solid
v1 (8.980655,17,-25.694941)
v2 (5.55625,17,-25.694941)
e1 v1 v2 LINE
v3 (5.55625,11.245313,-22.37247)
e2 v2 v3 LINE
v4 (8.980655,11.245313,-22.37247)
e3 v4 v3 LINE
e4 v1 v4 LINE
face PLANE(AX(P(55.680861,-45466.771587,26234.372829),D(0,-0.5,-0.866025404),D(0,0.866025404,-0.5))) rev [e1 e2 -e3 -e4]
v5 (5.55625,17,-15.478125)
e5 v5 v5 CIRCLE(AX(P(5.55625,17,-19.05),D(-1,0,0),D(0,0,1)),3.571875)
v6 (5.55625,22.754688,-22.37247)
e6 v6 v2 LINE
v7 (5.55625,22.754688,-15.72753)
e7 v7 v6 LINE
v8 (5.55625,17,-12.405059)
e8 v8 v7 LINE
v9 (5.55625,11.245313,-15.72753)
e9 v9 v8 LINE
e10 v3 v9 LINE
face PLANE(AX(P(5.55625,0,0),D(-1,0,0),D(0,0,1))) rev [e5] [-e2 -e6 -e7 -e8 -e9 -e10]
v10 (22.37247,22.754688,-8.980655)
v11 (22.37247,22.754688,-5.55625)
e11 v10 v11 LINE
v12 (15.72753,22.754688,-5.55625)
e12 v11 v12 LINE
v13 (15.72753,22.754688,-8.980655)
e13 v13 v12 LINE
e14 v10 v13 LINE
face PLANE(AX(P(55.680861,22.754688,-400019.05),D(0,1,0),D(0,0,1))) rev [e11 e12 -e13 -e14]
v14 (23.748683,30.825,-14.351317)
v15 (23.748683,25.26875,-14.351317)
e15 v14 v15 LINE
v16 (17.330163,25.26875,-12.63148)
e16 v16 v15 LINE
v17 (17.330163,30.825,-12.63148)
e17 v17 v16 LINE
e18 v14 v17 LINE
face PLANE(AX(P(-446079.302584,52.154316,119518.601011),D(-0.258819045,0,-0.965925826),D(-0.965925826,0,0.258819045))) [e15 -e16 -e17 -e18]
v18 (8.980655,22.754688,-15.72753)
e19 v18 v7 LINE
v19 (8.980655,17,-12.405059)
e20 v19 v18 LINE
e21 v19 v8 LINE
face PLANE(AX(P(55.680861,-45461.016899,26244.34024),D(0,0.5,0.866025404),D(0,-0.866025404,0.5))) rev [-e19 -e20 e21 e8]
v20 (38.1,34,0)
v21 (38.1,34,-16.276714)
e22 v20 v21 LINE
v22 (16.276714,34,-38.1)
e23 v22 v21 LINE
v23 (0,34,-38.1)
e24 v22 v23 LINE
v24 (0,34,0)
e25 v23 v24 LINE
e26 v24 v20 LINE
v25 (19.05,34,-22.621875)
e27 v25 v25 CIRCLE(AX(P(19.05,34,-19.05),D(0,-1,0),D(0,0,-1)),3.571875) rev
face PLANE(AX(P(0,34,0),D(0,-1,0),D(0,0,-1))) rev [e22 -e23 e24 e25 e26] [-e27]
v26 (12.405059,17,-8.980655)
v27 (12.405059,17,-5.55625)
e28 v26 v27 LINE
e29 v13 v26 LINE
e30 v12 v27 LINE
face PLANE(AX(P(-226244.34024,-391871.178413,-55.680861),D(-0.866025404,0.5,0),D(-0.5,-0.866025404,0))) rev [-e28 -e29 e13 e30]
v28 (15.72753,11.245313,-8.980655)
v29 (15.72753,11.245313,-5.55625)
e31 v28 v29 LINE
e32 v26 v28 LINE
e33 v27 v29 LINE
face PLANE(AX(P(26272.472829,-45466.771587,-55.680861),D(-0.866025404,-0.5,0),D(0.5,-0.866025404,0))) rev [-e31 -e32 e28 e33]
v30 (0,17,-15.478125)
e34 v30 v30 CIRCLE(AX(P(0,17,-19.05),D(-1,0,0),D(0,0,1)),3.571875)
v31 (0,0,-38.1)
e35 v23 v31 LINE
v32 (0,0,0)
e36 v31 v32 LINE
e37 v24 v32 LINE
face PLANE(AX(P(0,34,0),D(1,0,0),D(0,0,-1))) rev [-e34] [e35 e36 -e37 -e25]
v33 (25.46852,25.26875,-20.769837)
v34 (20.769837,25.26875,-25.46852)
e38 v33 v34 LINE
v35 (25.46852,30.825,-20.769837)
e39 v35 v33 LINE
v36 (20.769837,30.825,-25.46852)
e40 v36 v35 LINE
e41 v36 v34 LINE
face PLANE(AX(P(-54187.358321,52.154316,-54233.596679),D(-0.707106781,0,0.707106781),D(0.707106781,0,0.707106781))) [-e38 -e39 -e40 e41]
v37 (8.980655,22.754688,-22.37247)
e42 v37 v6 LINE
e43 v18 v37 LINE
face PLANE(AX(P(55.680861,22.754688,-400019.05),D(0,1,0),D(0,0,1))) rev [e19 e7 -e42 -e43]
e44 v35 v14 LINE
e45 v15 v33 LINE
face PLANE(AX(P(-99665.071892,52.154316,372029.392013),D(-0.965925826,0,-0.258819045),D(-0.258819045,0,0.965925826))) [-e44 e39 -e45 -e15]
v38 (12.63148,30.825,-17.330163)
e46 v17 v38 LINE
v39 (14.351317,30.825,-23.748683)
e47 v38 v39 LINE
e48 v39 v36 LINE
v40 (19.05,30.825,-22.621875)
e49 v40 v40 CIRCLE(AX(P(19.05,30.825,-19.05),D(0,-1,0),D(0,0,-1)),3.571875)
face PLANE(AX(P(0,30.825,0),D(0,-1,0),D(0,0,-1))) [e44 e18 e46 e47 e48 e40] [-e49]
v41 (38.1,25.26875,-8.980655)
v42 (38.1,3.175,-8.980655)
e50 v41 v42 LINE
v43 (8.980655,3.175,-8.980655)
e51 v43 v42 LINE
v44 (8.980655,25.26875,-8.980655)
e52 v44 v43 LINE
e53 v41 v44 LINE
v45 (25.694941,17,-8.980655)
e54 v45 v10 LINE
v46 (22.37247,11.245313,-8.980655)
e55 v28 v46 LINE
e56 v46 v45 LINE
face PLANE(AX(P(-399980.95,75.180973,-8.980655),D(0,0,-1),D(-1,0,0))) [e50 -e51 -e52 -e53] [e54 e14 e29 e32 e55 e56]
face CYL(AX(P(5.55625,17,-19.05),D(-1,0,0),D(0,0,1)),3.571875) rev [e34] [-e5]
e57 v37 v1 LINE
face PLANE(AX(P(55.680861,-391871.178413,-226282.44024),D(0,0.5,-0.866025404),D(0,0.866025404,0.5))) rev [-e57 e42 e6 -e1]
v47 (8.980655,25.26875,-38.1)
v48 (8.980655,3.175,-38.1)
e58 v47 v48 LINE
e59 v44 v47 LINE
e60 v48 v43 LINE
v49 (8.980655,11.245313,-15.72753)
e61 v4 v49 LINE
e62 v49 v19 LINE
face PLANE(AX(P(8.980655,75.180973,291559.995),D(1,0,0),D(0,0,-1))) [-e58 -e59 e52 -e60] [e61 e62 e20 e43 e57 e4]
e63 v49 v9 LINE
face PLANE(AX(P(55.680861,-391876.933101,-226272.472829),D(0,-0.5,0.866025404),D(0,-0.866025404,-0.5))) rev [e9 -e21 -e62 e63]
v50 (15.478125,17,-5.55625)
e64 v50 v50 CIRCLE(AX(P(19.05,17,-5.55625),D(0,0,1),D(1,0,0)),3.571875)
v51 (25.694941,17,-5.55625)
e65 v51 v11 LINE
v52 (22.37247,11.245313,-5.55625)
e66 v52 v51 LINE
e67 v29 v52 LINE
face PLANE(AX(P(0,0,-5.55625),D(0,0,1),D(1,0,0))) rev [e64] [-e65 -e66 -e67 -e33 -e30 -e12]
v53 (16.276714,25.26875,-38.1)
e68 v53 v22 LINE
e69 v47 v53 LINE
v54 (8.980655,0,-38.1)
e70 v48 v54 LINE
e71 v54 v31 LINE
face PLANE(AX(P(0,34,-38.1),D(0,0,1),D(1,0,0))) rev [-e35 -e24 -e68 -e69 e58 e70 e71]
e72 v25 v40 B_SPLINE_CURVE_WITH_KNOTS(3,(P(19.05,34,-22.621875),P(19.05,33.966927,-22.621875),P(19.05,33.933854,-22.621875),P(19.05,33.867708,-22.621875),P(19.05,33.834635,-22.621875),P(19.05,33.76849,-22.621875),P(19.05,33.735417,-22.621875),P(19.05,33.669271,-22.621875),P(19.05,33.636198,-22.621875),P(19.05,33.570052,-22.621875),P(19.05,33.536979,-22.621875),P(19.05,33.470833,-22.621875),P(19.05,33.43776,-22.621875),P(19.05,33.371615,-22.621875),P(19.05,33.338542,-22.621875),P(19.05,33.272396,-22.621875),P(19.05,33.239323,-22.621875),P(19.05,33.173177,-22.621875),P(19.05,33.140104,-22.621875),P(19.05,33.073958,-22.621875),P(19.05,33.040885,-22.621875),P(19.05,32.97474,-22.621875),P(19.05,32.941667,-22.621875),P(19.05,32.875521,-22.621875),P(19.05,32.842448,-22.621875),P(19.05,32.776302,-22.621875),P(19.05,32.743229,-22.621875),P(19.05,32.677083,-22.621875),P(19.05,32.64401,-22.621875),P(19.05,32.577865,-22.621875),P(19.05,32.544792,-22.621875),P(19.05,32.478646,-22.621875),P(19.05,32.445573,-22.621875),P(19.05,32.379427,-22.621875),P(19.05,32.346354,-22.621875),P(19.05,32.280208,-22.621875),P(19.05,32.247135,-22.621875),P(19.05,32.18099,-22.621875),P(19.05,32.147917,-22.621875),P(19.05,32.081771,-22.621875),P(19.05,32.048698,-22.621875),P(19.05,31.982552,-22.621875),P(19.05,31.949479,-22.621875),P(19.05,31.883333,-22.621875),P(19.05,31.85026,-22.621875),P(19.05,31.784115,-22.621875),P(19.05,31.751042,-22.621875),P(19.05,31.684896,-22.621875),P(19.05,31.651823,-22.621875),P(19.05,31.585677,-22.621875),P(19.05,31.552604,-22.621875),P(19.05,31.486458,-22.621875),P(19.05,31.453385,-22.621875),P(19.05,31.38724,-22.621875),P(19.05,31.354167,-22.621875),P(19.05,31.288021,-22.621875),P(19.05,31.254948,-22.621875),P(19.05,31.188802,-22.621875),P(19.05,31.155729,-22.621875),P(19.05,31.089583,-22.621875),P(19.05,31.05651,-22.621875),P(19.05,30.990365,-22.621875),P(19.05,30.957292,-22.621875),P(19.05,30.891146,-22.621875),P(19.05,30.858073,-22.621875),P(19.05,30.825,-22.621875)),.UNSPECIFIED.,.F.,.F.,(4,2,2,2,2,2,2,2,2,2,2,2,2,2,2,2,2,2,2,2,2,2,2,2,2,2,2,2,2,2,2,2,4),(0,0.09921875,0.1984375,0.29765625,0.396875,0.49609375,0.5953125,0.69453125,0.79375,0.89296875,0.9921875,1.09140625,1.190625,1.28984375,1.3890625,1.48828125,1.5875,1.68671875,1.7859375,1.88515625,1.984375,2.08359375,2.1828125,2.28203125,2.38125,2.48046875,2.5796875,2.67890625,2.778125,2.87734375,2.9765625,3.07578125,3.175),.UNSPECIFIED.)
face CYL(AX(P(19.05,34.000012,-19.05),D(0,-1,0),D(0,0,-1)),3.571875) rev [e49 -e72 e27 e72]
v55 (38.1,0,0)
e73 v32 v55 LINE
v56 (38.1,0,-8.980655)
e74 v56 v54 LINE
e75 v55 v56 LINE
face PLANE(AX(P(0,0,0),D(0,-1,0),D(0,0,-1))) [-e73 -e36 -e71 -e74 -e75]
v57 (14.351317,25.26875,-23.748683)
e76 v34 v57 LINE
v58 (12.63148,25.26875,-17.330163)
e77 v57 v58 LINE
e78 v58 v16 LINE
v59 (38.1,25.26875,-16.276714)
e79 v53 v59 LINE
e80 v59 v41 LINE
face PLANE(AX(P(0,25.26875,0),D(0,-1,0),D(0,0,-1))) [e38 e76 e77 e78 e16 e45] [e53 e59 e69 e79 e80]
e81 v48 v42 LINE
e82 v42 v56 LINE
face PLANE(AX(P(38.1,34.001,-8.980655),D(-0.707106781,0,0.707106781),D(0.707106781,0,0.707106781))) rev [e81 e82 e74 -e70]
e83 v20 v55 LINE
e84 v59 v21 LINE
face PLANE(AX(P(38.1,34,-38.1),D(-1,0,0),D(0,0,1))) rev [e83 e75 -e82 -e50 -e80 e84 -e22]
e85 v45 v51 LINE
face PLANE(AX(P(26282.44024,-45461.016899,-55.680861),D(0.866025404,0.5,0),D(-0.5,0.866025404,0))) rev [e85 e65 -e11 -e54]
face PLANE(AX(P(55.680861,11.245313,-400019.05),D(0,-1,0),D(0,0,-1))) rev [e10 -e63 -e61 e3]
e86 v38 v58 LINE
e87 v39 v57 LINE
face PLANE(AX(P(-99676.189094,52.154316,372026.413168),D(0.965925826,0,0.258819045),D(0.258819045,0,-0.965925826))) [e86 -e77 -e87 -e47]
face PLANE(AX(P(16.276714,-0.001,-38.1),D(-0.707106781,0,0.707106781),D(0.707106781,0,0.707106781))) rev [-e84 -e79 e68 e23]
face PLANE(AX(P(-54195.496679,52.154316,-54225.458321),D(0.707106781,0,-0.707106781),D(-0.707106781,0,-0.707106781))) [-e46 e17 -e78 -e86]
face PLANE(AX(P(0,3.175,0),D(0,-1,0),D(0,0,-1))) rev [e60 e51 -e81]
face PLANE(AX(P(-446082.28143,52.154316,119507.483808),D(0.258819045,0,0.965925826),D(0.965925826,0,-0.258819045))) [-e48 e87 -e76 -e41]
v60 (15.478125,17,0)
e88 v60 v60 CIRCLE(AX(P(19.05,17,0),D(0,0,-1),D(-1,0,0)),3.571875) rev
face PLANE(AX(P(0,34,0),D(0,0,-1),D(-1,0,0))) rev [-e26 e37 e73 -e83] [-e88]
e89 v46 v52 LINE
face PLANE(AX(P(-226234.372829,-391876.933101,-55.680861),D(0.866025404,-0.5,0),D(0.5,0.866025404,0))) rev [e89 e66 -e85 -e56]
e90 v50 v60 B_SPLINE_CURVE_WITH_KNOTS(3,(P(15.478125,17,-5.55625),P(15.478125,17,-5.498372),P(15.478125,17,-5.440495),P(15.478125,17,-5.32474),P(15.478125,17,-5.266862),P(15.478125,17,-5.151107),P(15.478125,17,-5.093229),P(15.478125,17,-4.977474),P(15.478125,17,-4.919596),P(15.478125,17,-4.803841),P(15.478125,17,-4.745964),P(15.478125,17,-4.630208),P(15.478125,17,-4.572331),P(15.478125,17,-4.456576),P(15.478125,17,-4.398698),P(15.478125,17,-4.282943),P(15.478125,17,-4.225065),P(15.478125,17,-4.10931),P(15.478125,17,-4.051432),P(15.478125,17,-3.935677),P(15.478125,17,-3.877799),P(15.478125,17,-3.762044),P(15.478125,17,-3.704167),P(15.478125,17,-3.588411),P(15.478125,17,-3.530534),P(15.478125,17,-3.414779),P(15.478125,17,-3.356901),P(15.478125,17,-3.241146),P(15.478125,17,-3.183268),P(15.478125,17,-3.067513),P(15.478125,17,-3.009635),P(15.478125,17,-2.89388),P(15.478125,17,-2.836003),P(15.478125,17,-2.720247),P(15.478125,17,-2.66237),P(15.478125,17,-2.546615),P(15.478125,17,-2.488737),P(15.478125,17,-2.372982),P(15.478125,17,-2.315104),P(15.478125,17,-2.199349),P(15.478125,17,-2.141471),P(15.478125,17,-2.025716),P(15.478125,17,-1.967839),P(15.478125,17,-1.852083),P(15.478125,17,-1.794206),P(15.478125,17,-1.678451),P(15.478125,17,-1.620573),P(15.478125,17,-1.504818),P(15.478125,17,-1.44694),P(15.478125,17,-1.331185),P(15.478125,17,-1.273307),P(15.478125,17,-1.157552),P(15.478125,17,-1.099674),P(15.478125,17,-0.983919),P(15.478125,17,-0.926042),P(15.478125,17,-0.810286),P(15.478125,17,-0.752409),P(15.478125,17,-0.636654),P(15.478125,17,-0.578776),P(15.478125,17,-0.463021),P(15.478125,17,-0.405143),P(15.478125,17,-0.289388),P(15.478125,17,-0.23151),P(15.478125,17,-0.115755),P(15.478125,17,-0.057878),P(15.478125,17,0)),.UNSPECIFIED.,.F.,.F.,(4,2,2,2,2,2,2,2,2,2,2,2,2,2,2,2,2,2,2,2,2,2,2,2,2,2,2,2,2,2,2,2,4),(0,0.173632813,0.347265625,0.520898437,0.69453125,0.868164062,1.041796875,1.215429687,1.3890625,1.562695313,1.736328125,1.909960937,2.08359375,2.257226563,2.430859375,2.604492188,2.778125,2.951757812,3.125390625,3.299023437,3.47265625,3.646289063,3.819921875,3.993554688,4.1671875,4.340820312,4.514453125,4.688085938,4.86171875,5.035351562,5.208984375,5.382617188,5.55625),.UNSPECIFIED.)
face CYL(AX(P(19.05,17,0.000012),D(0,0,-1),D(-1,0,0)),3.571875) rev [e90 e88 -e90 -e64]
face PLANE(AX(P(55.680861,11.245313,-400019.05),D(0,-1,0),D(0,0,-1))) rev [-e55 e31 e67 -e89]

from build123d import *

# Parameters (mm, degrees)
SKETCH1_W                    = 38.1
SKETCH1_H                    = 38.1
MAIN_BODY_DEPTH              = 34
F_9_32_RIGHT_RAIL_DEPTH      = 64.712008287
F_9_32_RIGHT_RAIL_DEPTH_BACK = 5.55625
SKETCH3_R                    = 3.571875
SKETCH4_R                    = 3.571875
F_9_32_LEFT_RAIL_DEPTH       = 5.55625
F_9_32_TOPPER_DEPTH          = 64.712008287
F_9_32_TOPPER_DEPTH_BACK     = 10
SKETCH8_R                    = 3.571875
CUT_EXTRUDE3_START           = -5.55625
CUT_EXTRUDE3_DEPTH           = 32.54375
CUT_EXTRUDE4_START           = -5.55625
CUT_EXTRUDE4_DEPTH           = 32.54375
CUT_EXTRUDE12_START          = -30.825
CUT_EXTRUDE12_OUTLINE_W      = 29.119345377
CUT_EXTRUDE12_OUTLINE_H      = 29.119345377
CUT_EXTRUDE12_DEPTH          = 22.09375
CUT_EXTRUDE15_START          = -17
CUT_EXTRUDE15_DEPTH          = 13.825
CUT_EXTRUDE16_REACH          = 65.712
CUT_EXTRUDE17_REACH          = 65.712


# Read off the part's stored shape, not the designer's step: Cut-Extrude12
with BuildPart() as part:
    # Sketch1 → Main Body (new body)
    with BuildSketch(Plane(origin=(0, 0, 0), x_dir=(1, 0, 0), z_dir=(0, 1, 0))):
        with Locations((19.05, 19.05)):
            Rectangle(SKETCH1_W, SKETCH1_H)
    extrude(amount=MAIN_BODY_DEPTH)

    # Sketch3 → 9/32 Right Rail (cut, two sides: drawn at the far end of the back side and taken through both)
    with BuildSketch(Plane.XY.offset(-F_9_32_RIGHT_RAIL_DEPTH_BACK)):
        with Locations(Location((19.05, 17, 0), (0, 0, 180))):
            Circle(SKETCH3_R)
    extrude(amount=F_9_32_RIGHT_RAIL_DEPTH + F_9_32_RIGHT_RAIL_DEPTH_BACK, mode=Mode.SUBTRACT)

    # Sketch4 → 9/32 Left Rail (cut)
    with BuildSketch(Plane.ZY):
        with Locations((-19.05, 17)):
            Circle(SKETCH4_R)
    extrude(amount=-F_9_32_LEFT_RAIL_DEPTH, mode=Mode.SUBTRACT)

    # Sketch8 → 9/32 Topper (cut, two sides: drawn at the far end of the back side and taken through both)
    with BuildSketch(Plane(origin=(0, 34, 0), x_dir=(1, 0, 0), z_dir=(0, 1, 0)).offset(-F_9_32_TOPPER_DEPTH_BACK)):
        with Locations(Location((19.05, 19.05, 0), (0, 0, 90))):
            Circle(SKETCH8_R)
    extrude(amount=F_9_32_TOPPER_DEPTH + F_9_32_TOPPER_DEPTH_BACK, mode=Mode.SUBTRACT)

    # Sketch9 → Cut-Extrude3 (cut)
    with BuildSketch(Plane.ZY.offset(CUT_EXTRUDE3_START)):
        Polygon((-22.372470377, 22.7546875), (-25.694940754, 17), (-22.372470377, 11.2453125), (-15.727529623, 11.2453125), (-12.405059246, 17), (-15.727529623, 22.7546875), align=None)
    extrude(amount=-CUT_EXTRUDE3_DEPTH, mode=Mode.SUBTRACT)

    # Sketch10 → Cut-Extrude4 (cut)
    with BuildSketch(Plane.XY.offset(CUT_EXTRUDE4_START)):
        Polygon((15.727529623, 22.7546875), (12.405059246, 17), (15.727529623, 11.2453125), (22.372470377, 11.2453125), (25.694940754, 17), (22.372470377, 22.7546875), align=None)
    extrude(amount=-CUT_EXTRUDE4_DEPTH, mode=Mode.SUBTRACT)

    # Cut-Extrude12 outline → Cut-Extrude12 (cut)
    with BuildSketch(Plane(origin=(0, 34, 0), x_dir=(1, 0, 0), z_dir=(0, 1, 0)).offset(CUT_EXTRUDE12_START)):
        with Locations((23.540327312, 23.540327312)):
            Rectangle(CUT_EXTRUDE12_OUTLINE_W, CUT_EXTRUDE12_OUTLINE_H)
    extrude(amount=CUT_EXTRUDE12_DEPTH, mode=Mode.SUBTRACT)

    # Sketch14 → Cut-Extrude15 (cut)
    with BuildSketch(Plane(origin=(0, 34, 0), x_dir=(1, 0, 0), z_dir=(0, 1, 0)).offset(CUT_EXTRUDE15_START)):
        Polygon((23.748682668, 14.351317332), (25.468519889, 20.769837221), (20.769837221, 25.468519889), (14.351317332, 23.748682668), (12.631480111, 17.330162779), (17.330162779, 12.631480111), align=None)
    extrude(amount=CUT_EXTRUDE15_DEPTH, mode=Mode.SUBTRACT)

    # Sketch15 → Cut-Extrude16 (cut, up to next)
    with BuildSketch(Plane.XZ, mode=Mode.PRIVATE) as cut_extrude16_sk1:
        Polygon((38.1, -8.980654623), (8.980654623, -38.1), (38.1, -38.1), align=None)
    cut_extrude16_tool1 = extrude(cut_extrude16_sk1.sketch, amount=-CUT_EXTRUDE16_REACH, mode=Mode.PRIVATE) & part.part
    add(cut_extrude16_tool1.solids().sort_by_distance((28.393552, 0, -28.393552))[0], mode=Mode.SUBTRACT)

    # Sketch16 → Cut-Extrude17 (cut, up to next)
    with BuildSketch(Plane(origin=(0, 34, 0), x_dir=(1, 0, 0), z_dir=(0, 1, 0)), mode=Mode.PRIVATE) as cut_extrude17_sk1:
        Polygon((38.1, 38.1), (16.276714219, 38.1), (38.1, 16.276714219), align=None)
    cut_extrude17_tool1 = extrude(cut_extrude17_sk1.sketch, amount=-CUT_EXTRUDE17_REACH, mode=Mode.PRIVATE) & part.part
    add(cut_extrude17_tool1.solids().sort_by_distance((30.825571, 34, -30.825571))[0], mode=Mode.SUBTRACT)


solid = part.part
